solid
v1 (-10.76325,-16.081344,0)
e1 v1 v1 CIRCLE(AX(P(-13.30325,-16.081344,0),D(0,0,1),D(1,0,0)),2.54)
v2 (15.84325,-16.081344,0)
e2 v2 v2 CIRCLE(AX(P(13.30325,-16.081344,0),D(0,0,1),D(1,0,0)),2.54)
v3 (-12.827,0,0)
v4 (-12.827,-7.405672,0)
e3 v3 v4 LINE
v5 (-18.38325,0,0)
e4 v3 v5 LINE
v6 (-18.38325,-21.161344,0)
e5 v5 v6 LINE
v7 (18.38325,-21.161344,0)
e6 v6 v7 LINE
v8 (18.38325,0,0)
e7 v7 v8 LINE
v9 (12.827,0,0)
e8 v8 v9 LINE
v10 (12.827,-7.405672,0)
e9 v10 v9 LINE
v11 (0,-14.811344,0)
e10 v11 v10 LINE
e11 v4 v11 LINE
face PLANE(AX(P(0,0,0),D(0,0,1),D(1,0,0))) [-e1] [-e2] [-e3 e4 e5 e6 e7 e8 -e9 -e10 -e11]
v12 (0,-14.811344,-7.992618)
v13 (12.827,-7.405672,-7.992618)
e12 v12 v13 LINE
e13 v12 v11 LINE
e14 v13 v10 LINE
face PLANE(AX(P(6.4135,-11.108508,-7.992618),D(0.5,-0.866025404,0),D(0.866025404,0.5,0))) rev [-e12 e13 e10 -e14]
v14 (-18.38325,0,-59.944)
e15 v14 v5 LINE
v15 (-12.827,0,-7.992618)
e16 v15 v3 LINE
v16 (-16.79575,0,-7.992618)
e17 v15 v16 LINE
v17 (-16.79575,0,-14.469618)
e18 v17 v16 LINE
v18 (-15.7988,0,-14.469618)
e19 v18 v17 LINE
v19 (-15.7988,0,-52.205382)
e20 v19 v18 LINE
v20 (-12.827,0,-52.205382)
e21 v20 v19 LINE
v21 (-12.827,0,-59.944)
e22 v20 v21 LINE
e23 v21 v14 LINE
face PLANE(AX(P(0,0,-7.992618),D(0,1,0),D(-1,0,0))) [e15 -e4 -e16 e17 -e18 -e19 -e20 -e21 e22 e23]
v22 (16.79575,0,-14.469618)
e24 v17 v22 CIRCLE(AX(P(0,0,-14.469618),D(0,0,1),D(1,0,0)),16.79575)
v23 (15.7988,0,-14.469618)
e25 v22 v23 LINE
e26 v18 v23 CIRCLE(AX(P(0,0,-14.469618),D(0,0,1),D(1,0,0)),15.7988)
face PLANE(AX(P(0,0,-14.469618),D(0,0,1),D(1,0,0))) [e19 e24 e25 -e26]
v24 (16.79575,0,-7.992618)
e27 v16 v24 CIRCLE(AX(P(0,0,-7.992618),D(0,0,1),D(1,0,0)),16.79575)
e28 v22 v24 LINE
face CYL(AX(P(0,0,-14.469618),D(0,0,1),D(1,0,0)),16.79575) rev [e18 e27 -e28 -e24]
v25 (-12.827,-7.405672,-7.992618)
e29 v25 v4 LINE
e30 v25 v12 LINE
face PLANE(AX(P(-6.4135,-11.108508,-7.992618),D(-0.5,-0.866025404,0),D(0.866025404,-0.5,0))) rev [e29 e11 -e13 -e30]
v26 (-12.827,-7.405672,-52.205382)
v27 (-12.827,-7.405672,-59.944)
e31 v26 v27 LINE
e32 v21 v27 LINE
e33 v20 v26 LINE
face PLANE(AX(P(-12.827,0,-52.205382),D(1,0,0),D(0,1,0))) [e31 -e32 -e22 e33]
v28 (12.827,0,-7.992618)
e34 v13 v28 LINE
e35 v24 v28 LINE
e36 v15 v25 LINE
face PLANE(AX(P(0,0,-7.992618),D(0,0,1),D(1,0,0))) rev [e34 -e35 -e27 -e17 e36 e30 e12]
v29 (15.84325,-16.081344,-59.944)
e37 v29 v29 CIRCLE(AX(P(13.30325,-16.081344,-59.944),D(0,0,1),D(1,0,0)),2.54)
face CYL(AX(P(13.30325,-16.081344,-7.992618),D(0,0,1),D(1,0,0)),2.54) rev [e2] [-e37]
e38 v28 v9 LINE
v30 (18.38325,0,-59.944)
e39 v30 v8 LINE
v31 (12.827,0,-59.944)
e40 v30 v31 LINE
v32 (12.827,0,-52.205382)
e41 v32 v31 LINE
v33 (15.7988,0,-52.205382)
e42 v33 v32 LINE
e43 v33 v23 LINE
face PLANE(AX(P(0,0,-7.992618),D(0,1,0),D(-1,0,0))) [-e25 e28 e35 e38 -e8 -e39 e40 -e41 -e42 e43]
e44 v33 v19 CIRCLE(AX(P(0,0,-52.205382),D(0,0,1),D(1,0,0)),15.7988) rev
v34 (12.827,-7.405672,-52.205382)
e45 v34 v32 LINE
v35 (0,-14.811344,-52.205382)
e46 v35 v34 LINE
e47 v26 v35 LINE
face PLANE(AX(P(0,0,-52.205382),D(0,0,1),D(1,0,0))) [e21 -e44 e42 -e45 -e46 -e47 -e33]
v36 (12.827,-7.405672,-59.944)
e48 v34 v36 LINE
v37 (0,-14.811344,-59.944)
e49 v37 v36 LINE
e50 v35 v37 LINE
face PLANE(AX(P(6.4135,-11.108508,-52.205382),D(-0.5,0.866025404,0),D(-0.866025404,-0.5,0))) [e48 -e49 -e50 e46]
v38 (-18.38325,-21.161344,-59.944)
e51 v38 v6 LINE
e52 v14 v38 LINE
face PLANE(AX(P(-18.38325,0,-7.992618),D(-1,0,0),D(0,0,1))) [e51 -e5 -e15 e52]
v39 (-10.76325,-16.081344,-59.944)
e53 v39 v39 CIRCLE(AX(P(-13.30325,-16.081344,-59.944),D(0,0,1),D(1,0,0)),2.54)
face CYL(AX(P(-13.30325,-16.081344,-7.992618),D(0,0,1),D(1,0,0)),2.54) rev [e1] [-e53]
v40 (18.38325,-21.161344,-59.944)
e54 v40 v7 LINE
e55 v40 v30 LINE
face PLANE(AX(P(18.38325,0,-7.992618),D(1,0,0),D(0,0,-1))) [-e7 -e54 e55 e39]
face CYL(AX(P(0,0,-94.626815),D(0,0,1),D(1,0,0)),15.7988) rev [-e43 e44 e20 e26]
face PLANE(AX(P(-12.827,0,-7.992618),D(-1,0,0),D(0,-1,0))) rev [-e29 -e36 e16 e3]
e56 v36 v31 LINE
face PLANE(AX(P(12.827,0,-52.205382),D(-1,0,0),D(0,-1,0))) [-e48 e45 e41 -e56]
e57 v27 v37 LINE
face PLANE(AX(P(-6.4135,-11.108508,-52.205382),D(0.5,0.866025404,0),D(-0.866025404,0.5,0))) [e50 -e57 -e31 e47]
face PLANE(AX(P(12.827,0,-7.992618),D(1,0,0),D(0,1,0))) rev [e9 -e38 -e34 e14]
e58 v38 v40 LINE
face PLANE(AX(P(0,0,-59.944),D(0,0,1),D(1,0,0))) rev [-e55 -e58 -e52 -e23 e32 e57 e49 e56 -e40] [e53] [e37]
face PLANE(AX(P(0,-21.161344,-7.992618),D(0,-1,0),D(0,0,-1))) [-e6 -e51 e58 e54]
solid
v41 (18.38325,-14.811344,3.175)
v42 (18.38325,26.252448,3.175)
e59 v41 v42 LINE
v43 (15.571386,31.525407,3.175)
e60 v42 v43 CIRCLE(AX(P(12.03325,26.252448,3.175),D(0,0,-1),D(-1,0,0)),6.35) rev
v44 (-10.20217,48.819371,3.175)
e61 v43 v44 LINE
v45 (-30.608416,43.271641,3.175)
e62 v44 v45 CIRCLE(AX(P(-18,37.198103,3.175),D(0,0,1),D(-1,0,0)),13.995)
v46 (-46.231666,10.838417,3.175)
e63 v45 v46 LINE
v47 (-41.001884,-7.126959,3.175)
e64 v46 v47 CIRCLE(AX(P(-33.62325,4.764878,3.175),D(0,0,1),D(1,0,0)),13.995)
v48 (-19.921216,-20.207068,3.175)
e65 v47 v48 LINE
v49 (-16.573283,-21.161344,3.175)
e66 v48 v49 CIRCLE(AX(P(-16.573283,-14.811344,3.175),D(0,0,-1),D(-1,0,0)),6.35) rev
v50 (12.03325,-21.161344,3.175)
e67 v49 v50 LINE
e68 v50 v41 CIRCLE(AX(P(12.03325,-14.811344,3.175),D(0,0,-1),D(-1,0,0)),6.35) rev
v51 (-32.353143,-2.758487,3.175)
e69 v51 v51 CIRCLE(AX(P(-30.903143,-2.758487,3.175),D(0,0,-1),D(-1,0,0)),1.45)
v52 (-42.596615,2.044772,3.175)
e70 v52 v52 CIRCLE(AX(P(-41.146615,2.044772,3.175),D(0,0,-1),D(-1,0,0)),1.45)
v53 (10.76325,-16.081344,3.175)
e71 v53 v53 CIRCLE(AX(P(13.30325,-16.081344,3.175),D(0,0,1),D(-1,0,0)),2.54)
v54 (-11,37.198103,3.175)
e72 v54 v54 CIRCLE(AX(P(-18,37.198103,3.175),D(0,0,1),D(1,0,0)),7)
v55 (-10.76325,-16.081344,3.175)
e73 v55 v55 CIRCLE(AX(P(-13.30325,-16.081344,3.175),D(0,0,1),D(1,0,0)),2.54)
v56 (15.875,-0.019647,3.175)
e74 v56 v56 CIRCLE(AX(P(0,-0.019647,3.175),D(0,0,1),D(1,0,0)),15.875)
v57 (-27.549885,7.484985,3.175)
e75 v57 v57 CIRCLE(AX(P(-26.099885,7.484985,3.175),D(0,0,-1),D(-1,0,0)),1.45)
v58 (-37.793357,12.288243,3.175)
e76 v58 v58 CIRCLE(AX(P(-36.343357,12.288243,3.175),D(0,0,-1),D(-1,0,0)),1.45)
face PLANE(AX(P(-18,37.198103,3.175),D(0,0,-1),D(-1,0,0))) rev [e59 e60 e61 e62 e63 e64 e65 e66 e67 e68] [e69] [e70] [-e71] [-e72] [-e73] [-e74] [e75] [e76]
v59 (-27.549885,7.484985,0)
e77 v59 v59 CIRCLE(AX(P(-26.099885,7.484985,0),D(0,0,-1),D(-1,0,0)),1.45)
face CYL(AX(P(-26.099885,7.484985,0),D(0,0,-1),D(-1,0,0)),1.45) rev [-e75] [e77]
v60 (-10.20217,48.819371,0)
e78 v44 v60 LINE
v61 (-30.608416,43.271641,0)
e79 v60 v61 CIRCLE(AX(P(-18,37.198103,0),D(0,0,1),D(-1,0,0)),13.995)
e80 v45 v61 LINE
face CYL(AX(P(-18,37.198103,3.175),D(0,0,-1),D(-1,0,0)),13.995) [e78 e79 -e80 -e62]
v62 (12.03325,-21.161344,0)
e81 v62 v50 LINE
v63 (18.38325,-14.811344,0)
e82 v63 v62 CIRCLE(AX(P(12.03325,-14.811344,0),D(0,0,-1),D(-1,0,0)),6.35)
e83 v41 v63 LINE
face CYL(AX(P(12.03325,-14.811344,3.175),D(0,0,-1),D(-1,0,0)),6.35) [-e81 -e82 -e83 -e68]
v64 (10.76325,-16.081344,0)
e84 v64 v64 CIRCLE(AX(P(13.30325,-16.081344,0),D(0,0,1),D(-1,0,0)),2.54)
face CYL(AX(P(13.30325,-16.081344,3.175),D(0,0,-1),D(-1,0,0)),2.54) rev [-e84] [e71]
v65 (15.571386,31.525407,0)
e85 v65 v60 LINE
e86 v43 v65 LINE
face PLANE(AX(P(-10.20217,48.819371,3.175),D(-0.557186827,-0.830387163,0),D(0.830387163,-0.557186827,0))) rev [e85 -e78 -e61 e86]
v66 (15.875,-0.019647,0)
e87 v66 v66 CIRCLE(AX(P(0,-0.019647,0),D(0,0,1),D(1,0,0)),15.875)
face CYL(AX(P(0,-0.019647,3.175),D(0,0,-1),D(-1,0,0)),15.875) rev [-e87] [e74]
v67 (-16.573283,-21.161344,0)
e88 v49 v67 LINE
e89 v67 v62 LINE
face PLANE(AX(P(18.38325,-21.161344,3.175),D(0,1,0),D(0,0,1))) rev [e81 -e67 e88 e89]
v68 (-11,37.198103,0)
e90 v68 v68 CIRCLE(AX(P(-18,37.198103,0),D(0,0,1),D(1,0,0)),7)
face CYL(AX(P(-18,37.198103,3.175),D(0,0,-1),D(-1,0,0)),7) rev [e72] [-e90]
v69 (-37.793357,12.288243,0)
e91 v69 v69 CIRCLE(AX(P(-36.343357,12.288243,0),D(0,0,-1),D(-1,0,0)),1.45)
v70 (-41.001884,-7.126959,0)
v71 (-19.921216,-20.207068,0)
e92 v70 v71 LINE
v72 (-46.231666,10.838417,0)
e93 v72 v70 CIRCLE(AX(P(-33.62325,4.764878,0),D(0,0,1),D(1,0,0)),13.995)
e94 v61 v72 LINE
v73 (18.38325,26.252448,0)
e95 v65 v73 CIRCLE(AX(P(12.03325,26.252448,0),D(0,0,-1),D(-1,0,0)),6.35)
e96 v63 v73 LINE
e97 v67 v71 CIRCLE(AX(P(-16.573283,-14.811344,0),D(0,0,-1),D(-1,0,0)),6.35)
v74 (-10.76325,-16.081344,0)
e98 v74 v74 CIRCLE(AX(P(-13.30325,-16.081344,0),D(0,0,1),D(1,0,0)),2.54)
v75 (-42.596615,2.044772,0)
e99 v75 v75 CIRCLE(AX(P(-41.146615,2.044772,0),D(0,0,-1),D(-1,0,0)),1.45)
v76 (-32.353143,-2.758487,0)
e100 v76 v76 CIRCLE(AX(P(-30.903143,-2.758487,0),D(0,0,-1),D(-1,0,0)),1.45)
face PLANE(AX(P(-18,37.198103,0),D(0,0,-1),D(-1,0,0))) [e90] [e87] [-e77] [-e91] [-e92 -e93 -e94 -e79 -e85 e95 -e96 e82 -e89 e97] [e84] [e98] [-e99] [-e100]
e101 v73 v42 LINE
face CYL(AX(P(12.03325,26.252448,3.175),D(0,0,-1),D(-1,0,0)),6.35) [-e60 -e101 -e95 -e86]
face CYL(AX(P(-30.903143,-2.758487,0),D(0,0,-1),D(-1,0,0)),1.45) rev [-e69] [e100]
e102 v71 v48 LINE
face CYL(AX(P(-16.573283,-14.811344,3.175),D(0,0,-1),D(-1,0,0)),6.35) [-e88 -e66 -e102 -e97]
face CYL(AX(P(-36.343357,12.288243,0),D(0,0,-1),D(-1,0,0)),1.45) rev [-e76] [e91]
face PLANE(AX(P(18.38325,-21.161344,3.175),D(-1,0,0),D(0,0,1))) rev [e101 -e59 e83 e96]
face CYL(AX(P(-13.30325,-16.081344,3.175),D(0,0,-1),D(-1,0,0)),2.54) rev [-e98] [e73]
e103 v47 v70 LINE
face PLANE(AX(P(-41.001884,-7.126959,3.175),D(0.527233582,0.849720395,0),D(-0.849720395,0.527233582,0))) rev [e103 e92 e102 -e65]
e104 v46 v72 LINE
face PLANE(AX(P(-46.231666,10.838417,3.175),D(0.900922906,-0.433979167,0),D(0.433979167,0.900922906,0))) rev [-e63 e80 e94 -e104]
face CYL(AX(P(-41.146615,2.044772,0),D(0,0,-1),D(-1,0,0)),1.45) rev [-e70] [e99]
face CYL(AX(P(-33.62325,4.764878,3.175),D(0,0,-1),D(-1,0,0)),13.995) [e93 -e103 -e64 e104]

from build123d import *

# Parameters (mm, degrees)
SKETCH1_R                        = 2.54
BOSS_EXTRUDE1_DEPTH              = 7.992618
BOSS_EXTRUDE2_START              = -7.992618
SKETCH1_3_R                      = 2.54
BOSS_EXTRUDE2_DEPTH              = 6.477
BOSS_EXTRUDE4_START              = -59.944
SKETCH1_5_R                      = 2.54
BOSS_EXTRUDE4_DEPTH              = 7.738618
BOSS_EXTRUDE3_START              = -14.469618
SKETCH1_4_R                      = 2.54
BOSS_EXTRUDE3_DEPTH              = 37.735764
SKETCH2_R                        = 2.54
SKETCH2_R_2                      = 15.875
SKETCH2_R_3                      = 7
BOSS_EXTRUDE5_DEPTH              = 3.175
SKETCH3_W                        = 1.45
SKETCH3_H                        = 3.175
M3_5X0_6_TAPPED_HOLE1_AT_2_COUNT = 2
M3_5X0_6_TAPPED_HOLE1_AT_2_PITCH = 11.313708499
M3_5X0_6_TAPPED_HOLE1_AT_3_COUNT = 2
M3_5X0_6_TAPPED_HOLE1_AT_3_PITCH = 16
M3_5X0_6_TAPPED_HOLE1_AT_4_COUNT = 2
M3_5X0_6_TAPPED_HOLE1_AT_4_PITCH = 11.313708499
FILLET1_R                        = 6.35


with BuildPart() as part:
    # Sketch1 → Boss-Extrude1 (new body)
    with BuildSketch(Plane.XY):
        Polygon((-12.827, -7.405671903), (-12.827, 0), (-18.38325, 0), (-18.38325, -21.161343806), (18.38325, -21.161343806), (18.38325, 0), (12.827, 0), (12.827, -7.405671903), (0, -14.811343806), align=None)
        with Locations((13.30325, -16.081343806)):
            Circle(SKETCH1_R, mode=Mode.SUBTRACT)
        with Locations((-13.30325, -16.081343806)):
            Circle(SKETCH1_R, mode=Mode.SUBTRACT)
    extrude(amount=-BOSS_EXTRUDE1_DEPTH)

    # Sketch1<3> → Boss-Extrude2 (add)
    with BuildSketch(Plane.XY.offset(BOSS_EXTRUDE2_START)):
        with BuildLine():
            ThreePointArc((16.79575, 0), (0, -16.79575), (-16.79575, 0))
            Line((-16.79575, 0), (-18.38325, 0))
            Line((-18.38325, 0), (-18.38325, -21.161343806))
            Line((-18.38325, -21.161343806), (18.38325, -21.161343806))
            Line((18.38325, -21.161343806), (18.38325, 0))
            Line((18.38325, 0), (16.79575, 0))
        make_face()
        with Locations((-13.30325, -16.081343806)):
            Circle(SKETCH1_3_R, mode=Mode.SUBTRACT)
        with Locations((13.30325, -16.081343806)):
            Circle(SKETCH1_3_R, mode=Mode.SUBTRACT)
    extrude(amount=-BOSS_EXTRUDE2_DEPTH)

    # Sketch1<4> → Boss-Extrude3 (add)
    with BuildSketch(Plane.XY.offset(BOSS_EXTRUDE3_START)):
        with BuildLine():
            ThreePointArc((15.7988, 0), (0, -15.7988), (-15.7988, 0))
            Line((-15.7988, 0), (-18.38325, 0))
            Line((-18.38325, 0), (-18.38325, -21.161343806))
            Line((-18.38325, -21.161343806), (18.38325, -21.161343806))
            Line((18.38325, -21.161343806), (18.38325, 0))
            Line((18.38325, 0), (15.7988, 0))
        make_face()
        with Locations((13.30325, -16.081343806)):
            Circle(SKETCH1_4_R, mode=Mode.SUBTRACT)
        with Locations((-13.30325, -16.081343806)):
            Circle(SKETCH1_4_R, mode=Mode.SUBTRACT)
    extrude(amount=-BOSS_EXTRUDE3_DEPTH)


with BuildPart() as body_2:
    # Sketch1<5> → Boss-Extrude4 (new body)
    with BuildSketch(Plane.XY.offset(BOSS_EXTRUDE4_START)):
        Polygon((-12.827, -7.405671903), (-12.827, 0), (-18.38325, 0), (-18.38325, -21.161343806), (18.38325, -21.161343806), (18.38325, 0), (12.827, 0), (12.827, -7.405671903), (0, -14.811343806), align=None)
        with Locations((13.30325, -16.081343806)):
            Circle(SKETCH1_5_R, mode=Mode.SUBTRACT)
        with Locations((-13.30325, -16.081343806)):
            Circle(SKETCH1_5_R, mode=Mode.SUBTRACT)
    extrude(amount=BOSS_EXTRUDE4_DEPTH)


with BuildPart() as part_1:
    add(part.part)

    # Combine1: union body 2
    add(body_2.part)


with BuildPart() as body_2_2:
    # Sketch2 → Boss-Extrude5 (new body)
    with BuildSketch(Plane.XY):
        with BuildLine():
            Line((18.38325, -21.161343806), (-18.38325, -21.161343806))
            Line((-18.38325, -21.161343806), (-41.001883978, -7.126958523))
            ThreePointArc((-41.001883978, -7.126958523), (-47.06048262, 0.853254126), (-46.231666072, 10.838416846))
            Line((-46.231666072, 10.838416846), (-30.608416072, 43.271641469))
            ThreePointArc((-30.608416072, 43.271641469), (-21.67147957, 50.702926717), (-10.202170361, 48.819371375))
            Line((-10.202170361, 48.819371375), (18.38325, 29.638656194))
            Line((18.38325, 29.638656194), (18.38325, -21.161343806))
        make_face()
        with Locations((-13.30325, -16.081343806)):
            Circle(SKETCH2_R, mode=Mode.SUBTRACT)
        with Locations(Location((13.30325, -16.081343806, 0), (0, 0, 180))):
            Circle(SKETCH2_R, mode=Mode.SUBTRACT)
        with Locations((0, -0.019646968)):
            Circle(SKETCH2_R_2, mode=Mode.SUBTRACT)
        with Locations((-18, 37.198103032)):
            Circle(SKETCH2_R_3, mode=Mode.SUBTRACT)
    extrude(amount=BOSS_EXTRUDE5_DEPTH)

    # Sketch3 → M3.5x0.6 Tapped Hole1 (revolve, cut)
    with BuildSketch(Plane(origin=(-26.099885072, 7.484985053, 0), x_dir=(0, 1, 0), z_dir=(1, 0, 0))):
        with Locations((0.725, 1.5875)):
            Rectangle(SKETCH3_W, SKETCH3_H)
    m3_5x0_6_tapped_hole1 = revolve(axis=Axis((-26.099885072, 7.484985053, -6.35), (0, 0, 1)), mode=Mode.SUBTRACT)

    # M3.5x0.6 Tapped Hole1 at 2: M3.5x0.6 Tapped Hole1 ×2
    with Locations(*[Vector(-0.9054035264513098, 0.4245520631083216, 0) * (i * M3_5X0_6_TAPPED_HOLE1_AT_2_PITCH) for i in range(1, M3_5X0_6_TAPPED_HOLE1_AT_2_COUNT)]):
        add(m3_5x0_6_tapped_hole1, mode=Mode.SUBTRACT)

    # M3.5x0.6 Tapped Hole1 at 3: M3.5x0.6 Tapped Hole1 ×2
    with Locations(*[Vector(-0.9404206160545683, -0.34001333047330123, 0) * (i * M3_5X0_6_TAPPED_HOLE1_AT_3_PITCH) for i in range(1, M3_5X0_6_TAPPED_HOLE1_AT_3_COUNT)]):
        add(m3_5x0_6_tapped_hole1, mode=Mode.SUBTRACT)

    # M3.5x0.6 Tapped Hole1 at 4: M3.5x0.6 Tapped Hole1 ×2
    with Locations(*[Vector(-0.42455206310832183, -0.9054035264513097, 0) * (i * M3_5X0_6_TAPPED_HOLE1_AT_4_PITCH) for i in range(1, M3_5X0_6_TAPPED_HOLE1_AT_4_COUNT)]):
        add(m3_5x0_6_tapped_hole1, mode=Mode.SUBTRACT)

    # Fillet1
    fillet1_edges = [body_2_2.edges().sort_by_distance(p)[0] for p in [
        (18.38325, -21.161343806, 1.5875),
        (-18.38325, -21.161343806, 1.5875),
        (18.38325, 29.638656194, 1.5875),
    ]]
    fillet(fillet1_edges, radius=FILLET1_R)


solid = Compound([part_1.part, body_2_2.part])
